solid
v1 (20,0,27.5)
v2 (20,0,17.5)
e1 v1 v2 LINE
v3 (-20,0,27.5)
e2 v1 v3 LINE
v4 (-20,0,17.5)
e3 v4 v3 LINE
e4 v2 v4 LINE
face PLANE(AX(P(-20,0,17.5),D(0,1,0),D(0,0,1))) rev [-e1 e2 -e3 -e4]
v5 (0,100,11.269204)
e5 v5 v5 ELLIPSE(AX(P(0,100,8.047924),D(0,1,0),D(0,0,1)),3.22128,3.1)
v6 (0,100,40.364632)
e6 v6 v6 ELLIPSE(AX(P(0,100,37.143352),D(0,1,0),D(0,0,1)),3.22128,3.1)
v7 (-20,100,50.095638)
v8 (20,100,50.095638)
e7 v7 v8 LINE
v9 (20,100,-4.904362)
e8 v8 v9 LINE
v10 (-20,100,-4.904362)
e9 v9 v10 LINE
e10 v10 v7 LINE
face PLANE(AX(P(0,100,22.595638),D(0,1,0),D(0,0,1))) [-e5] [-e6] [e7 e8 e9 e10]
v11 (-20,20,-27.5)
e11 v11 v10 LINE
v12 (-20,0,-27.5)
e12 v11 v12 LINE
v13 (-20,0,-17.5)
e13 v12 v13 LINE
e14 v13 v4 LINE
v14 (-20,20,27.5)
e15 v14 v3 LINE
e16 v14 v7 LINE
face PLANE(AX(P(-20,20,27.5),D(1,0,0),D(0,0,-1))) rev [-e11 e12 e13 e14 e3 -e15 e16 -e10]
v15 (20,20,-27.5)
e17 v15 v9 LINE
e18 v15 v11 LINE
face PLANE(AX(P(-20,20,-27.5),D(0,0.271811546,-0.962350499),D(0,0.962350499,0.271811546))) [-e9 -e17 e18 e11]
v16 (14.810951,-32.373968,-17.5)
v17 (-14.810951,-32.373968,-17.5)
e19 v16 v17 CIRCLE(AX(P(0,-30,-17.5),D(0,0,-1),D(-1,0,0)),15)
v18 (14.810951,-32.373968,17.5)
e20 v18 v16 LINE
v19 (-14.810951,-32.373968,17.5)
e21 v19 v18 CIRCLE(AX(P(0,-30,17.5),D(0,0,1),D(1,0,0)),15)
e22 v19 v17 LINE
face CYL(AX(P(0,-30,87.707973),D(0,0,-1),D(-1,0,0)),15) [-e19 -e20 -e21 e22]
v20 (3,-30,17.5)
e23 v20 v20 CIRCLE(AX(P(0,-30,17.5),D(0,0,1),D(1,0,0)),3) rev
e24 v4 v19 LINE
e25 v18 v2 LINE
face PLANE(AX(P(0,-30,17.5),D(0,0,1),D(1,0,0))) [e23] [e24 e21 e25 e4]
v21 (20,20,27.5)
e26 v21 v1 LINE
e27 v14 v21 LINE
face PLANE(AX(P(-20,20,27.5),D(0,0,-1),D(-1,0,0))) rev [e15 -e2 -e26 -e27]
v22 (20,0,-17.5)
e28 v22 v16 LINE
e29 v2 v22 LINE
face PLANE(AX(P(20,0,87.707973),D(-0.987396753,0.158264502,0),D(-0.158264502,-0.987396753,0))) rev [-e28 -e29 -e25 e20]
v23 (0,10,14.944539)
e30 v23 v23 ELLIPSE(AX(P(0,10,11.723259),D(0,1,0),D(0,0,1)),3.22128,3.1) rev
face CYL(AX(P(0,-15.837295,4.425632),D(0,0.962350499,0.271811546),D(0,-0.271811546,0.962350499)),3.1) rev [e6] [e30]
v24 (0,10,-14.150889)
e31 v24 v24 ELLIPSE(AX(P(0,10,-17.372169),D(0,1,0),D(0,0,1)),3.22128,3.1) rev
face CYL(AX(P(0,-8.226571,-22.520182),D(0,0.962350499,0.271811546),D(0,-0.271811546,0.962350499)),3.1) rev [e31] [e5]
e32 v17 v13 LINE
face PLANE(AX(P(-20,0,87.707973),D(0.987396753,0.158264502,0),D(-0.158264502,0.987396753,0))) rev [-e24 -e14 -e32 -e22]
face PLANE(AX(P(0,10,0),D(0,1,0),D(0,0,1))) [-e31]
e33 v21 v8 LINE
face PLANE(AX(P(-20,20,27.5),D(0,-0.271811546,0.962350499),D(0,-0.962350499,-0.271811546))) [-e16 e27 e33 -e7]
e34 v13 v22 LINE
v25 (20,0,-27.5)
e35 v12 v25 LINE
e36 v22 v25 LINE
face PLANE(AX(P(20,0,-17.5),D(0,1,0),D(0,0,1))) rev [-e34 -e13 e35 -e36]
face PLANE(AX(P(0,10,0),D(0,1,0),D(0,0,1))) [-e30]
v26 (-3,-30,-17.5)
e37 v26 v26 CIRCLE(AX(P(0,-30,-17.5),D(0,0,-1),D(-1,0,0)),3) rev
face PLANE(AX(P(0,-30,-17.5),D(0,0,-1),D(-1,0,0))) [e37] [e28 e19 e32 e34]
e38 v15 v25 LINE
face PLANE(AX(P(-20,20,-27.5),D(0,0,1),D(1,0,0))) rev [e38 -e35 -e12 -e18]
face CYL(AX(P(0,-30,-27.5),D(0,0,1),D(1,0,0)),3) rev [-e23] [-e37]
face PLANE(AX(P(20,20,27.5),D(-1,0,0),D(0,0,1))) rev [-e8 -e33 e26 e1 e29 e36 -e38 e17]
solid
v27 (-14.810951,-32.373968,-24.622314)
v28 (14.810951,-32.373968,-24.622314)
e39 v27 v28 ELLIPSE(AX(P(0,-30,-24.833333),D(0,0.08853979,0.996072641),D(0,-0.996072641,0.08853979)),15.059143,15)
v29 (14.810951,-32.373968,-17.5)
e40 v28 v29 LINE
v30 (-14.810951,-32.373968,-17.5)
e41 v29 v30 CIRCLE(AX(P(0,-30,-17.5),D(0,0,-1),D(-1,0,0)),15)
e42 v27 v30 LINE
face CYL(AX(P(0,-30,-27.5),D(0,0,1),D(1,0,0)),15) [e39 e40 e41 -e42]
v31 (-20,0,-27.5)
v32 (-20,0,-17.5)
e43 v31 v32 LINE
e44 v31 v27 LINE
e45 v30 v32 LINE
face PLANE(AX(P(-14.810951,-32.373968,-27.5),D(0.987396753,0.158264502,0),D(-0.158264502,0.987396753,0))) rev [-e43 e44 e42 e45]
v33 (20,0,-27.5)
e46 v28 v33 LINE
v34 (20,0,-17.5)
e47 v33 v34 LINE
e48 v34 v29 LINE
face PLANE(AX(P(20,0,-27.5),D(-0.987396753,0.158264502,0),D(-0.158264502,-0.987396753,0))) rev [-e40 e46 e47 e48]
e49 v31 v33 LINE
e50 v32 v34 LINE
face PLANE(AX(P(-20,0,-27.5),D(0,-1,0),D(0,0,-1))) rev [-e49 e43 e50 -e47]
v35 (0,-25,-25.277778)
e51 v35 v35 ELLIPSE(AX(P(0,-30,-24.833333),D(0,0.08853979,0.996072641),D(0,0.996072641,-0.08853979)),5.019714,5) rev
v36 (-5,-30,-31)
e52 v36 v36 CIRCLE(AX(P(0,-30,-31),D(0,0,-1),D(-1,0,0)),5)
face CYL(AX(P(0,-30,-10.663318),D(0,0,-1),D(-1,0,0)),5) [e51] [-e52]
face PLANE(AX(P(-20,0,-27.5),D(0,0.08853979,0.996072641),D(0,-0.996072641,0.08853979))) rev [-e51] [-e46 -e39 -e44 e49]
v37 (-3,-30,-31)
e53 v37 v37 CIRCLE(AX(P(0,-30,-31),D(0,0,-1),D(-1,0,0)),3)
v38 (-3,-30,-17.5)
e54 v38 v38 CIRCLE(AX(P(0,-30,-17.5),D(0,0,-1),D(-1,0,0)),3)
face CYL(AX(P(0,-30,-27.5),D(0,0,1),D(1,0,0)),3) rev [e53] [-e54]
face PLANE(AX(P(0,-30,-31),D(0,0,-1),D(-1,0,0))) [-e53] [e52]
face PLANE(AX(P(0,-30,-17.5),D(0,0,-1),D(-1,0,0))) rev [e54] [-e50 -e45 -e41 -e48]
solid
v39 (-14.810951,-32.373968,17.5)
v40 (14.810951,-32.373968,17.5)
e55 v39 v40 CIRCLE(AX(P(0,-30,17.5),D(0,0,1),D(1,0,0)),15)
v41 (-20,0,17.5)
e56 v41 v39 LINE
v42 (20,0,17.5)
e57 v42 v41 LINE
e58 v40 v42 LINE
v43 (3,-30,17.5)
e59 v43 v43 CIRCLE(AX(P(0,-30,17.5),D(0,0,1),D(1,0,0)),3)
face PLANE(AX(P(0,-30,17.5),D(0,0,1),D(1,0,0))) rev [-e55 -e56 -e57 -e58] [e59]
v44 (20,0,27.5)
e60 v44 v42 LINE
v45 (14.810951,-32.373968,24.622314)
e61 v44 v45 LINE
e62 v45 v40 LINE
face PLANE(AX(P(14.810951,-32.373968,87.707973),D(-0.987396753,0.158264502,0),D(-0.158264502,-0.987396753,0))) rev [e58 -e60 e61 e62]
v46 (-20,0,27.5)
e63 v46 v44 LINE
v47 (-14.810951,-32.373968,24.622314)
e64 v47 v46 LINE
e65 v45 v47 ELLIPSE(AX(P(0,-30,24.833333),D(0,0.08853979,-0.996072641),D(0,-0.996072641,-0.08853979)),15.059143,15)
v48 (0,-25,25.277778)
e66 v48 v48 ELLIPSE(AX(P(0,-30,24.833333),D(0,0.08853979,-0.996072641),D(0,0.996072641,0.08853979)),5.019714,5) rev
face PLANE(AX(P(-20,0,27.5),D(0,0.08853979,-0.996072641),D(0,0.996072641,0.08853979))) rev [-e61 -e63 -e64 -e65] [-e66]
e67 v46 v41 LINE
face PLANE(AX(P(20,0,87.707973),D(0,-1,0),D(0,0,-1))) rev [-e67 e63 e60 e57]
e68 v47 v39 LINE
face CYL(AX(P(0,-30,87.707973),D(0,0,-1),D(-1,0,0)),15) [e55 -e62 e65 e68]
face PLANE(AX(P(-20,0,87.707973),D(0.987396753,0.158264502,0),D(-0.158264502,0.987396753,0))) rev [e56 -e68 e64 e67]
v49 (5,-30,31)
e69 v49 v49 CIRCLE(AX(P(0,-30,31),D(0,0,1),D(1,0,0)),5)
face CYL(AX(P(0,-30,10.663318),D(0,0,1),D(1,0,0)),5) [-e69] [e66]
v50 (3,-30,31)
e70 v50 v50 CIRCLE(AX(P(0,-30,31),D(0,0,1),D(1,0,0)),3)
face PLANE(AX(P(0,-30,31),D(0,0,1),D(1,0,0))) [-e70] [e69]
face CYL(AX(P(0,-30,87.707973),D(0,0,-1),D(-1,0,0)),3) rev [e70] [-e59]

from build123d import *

# Parameters (mm, degrees)
CROQUIS1_W                          = 40
CROQUIS1_H                          = 55
SALIENTE_EXTRUIR1_DEPTH             = 20
SALIENTE_EXTRUIR2_REACH             = 41.449
SALIENTE_EXTRUIR2_DIRECTION_2_REACH = 41.449
CORTAR_EXTRUIR6_DEPTH               = 57.402570863
CORTAR_EXTRUIR6_DEPTH_BACK          = 57.402570863
CROQUIS6_R                          = 3
CORTAR_EXTRUIR10_DEPTH              = 10
CROQUIS11_R                         = 3
SALIENTE_EXTRUIR3_DEPTH             = 10
CORTAR_EXTRUIR11_DEPTH              = 57.402570863
CORTAR_EXTRUIR11_DEPTH_BACK         = 57.402570863
CORTAR_EXTRUIR15_START              = -10
CORTAR_EXTRUIR15_DEPTH              = 10
CROQUIS17_R                         = 3
SALIENTE_EXTRUIR4_DEPTH             = 10
CORTAR_EXTRUIR16_DEPTH              = 57.402570863
CORTAR_EXTRUIR16_DEPTH_BACK         = 57.402570863
CROQUIS21_R                         = 5
CROQUIS21_R_2                       = 3
SALIENTE_EXTRUIR5_DEPTH             = 3.5
SALIENTE_EXTRUIR5_DIRECTION_2_REACH = 75.824
CROQUIS22_R                         = 5
CROQUIS22_R_2                       = 3
SALIENTE_EXTRUIR6_DEPTH             = 3.5
SALIENTE_EXTRUIR6_DIRECTION_2_REACH = 78.467
BARRER1_START                       = -20
BARRER1_DEPTH                       = 40
CORTAR_EXTRUIR20_REACH              = 165.765
CROQUIS25_R                         = 3.1


# Read off the part's stored shape, not the designer's step: Barrer1
with BuildPart() as part:
    # Croquis1 → Saliente-Extruir1 (new body)
    with BuildSketch(Plane(origin=(0, 0, 0), x_dir=(1, 0, 0), z_dir=(0, 1, 0))):
        Rectangle(CROQUIS1_W, CROQUIS1_H)
    extrude(amount=SALIENTE_EXTRUIR1_DEPTH)

    # Saliente-Extruir2: up to this face of the body (flat: up to its plane)
    saliente_extruir2_end = Plane(part.part.faces().sort_by_distance((0, 10, 27.5))[0])
    # Croquis5 → Saliente-Extruir2 (add, up to the picked face)
    with BuildSketch(Plane.XY, mode=Mode.PRIVATE) as saliente_extruir2_sk1:
        with BuildLine():
            Line((-20, 0), (-14.810951292, -32.373967528))
            ThreePointArc((-14.810951292, -32.373967528), (0, -45), (14.810951292, -32.373967528))
            Line((14.810951292, -32.373967528), (20, 0))
            Line((20, 0), (-20, 0))
        make_face()
    saliente_extruir2_tool1 = split(extrude(saliente_extruir2_sk1.sketch, amount=SALIENTE_EXTRUIR2_REACH, mode=Mode.PRIVATE), bisect_by=saliente_extruir2_end, keep=Keep.BOTH, mode=Mode.PRIVATE)
    add(saliente_extruir2_tool1.solids().sort_by(Axis((0, -19.849245, 0), (0, 0, 1)))[0])

    # Saliente-Extruir2 direction 2: up to this face of the body (flat: up to its plane)
    saliente_extruir2_direction_2_end = Plane(part.part.faces().sort_by_distance((0, 10, -27.5))[0])
    # Croquis5 → Saliente-Extruir2 direction 2 (add, up to the picked face)
    with BuildSketch(Plane.XY, mode=Mode.PRIVATE) as saliente_extruir2_direction_2_sk1:
        with BuildLine():
            Line((-20, 0), (-14.810951292, -32.373967528))
            ThreePointArc((-14.810951292, -32.373967528), (0, -45), (14.810951292, -32.373967528))
            Line((14.810951292, -32.373967528), (20, 0))
            Line((20, 0), (-20, 0))
        make_face()
    saliente_extruir2_direction_2_tool1 = split(extrude(saliente_extruir2_direction_2_sk1.sketch, amount=-SALIENTE_EXTRUIR2_DIRECTION_2_REACH, mode=Mode.PRIVATE), bisect_by=saliente_extruir2_direction_2_end, keep=Keep.BOTH, mode=Mode.PRIVATE)
    add(saliente_extruir2_direction_2_tool1.solids().sort_by(Axis((0, -19.849245, 0), (0, 0, -1)))[0])

    # Croquis6 → Cortar-Extruir6 (cut, two sides: drawn at the far end of the back side and taken through both)
    with BuildSketch(Plane.XY.offset(-CORTAR_EXTRUIR6_DEPTH_BACK)):
        with Locations((0, -30)):
            Circle(CROQUIS6_R)
    extrude(amount=CORTAR_EXTRUIR6_DEPTH + CORTAR_EXTRUIR6_DEPTH_BACK, mode=Mode.SUBTRACT)

    # Croquis10 → Cortar-Extruir10 (cut)
    with BuildSketch(Plane(origin=(0, 0, -27.5), x_dir=(-1, 0, 0), z_dir=(0, 0, -1))):
        with BuildLine():
            Line((14.810951292, -32.373967528), (20, 0))
            Line((20, 0), (-20, 0))
            Line((-20, 0), (-14.810951292, -32.373967528))
            ThreePointArc((-14.810951292, -32.373967528), (0, -45), (14.810951292, -32.373967528))
        make_face()
    extrude(amount=-CORTAR_EXTRUIR10_DEPTH, mode=Mode.SUBTRACT)

    # Croquis16 → Cortar-Extruir15 (cut)
    with BuildSketch(Plane.XY.offset(27.5).offset(CORTAR_EXTRUIR15_START)):
        with BuildLine():
            Line((-20, 0), (20, 0))
            Line((20, 0), (14.810951292, -32.373967528))
            ThreePointArc((14.810951292, -32.373967528), (0, -45), (-14.810951292, -32.373967528))
            Line((-14.810951292, -32.373967528), (-20, 0))
        make_face()
    extrude(amount=CORTAR_EXTRUIR15_DEPTH, mode=Mode.SUBTRACT)

    # Barrer1 outline → Barrer1 (add)
    with BuildSketch(Plane.YZ.offset(BARRER1_START)):
        Polygon((20, -27.5), (100, -4.904361816), (100, 50.095638184), (20, 27.5), align=None)
    extrude(amount=BARRER1_DEPTH)

    # Cortar-Extruir20: up to this plane
    cortar_extruir20_end = Plane(origin=(0, 10, 0), z_dir=(0, 1, 0))
    # Croquis25 → Cortar-Extruir20 (cut, up to the surface)
    with BuildSketch(Plane(origin=(0, 105.715764038, 29.858939432), x_dir=(1, 0, 0), z_dir=(0, 0.9623504992532018, 0.27181154608867053)), mode=Mode.PRIVATE) as cortar_extruir20_sk1:
        with Locations(Location((0, 19.436230922, 0), (0, 0, 270))):
            Circle(CROQUIS25_R)
    cortar_extruir20_tool1 = split(extrude(cortar_extruir20_sk1.sketch, amount=-CORTAR_EXTRUIR20_REACH, mode=Mode.PRIVATE), bisect_by=cortar_extruir20_end, keep=Keep.BOTH, mode=Mode.PRIVATE)
    add(cortar_extruir20_tool1.solids().sort_by_distance((0, 110.998756, 11.154473))[0], mode=Mode.SUBTRACT)
    # Croquis25 → Cortar-Extruir20 (cut, up to the surface)
    with BuildSketch(Plane(origin=(0, 105.715764038, 29.858939432), x_dir=(1, 0, 0), z_dir=(0, 0.9623504992532018, 0.27181154608867053)), mode=Mode.PRIVATE) as cortar_extruir20_sk2:
        with Locations(Location((0, -8.563769078, 0), (0, 0, 270))):
            Circle(CROQUIS25_R)
    cortar_extruir20_tool2 = split(extrude(cortar_extruir20_sk2.sketch, amount=-CORTAR_EXTRUIR20_REACH, mode=Mode.PRIVATE), bisect_by=cortar_extruir20_end, keep=Keep.BOTH, mode=Mode.PRIVATE)
    add(cortar_extruir20_tool2.solids().sort_by_distance((0, 103.388033, 38.100287))[0], mode=Mode.SUBTRACT)


with BuildPart() as body_2:
    # Croquis11 → Saliente-Extruir3 (new body)
    with BuildSketch(Plane(origin=(0, 0, -17.5), x_dir=(-1, 0, 0), z_dir=(0, 0, -1))):
        with BuildLine():
            Line((20, 0), (-20, 0))
            Line((-20, 0), (-14.810951292, -32.373967528))
            ThreePointArc((-14.810951292, -32.373967528), (0, -45), (14.810951292, -32.373967528))
            Line((14.810951292, -32.373967528), (20, 0))
        make_face()
        with Locations((0, -30)):
            Circle(CROQUIS11_R, mode=Mode.SUBTRACT)
    extrude(amount=SALIENTE_EXTRUIR3_DEPTH)

    # Croquis12 → Cortar-Extruir11 (cut, two sides: drawn at the far end of the back side and taken through both)
    with BuildSketch(Plane(origin=(0, 0, 0), x_dir=(0, 0, -1), z_dir=(1, 0, 0)).offset(-CORTAR_EXTRUIR11_DEPTH_BACK)):
        with BuildLine():
            Line((27.5, 0), (23.5, -45))
            add(Edge.make_bspline(
                [(23.5, -45), (53.895048744, -65.691423054), (27.5, 0)],
                knots=[0, 0, 0, 1, 1, 1], degree=2))
        make_face()
    extrude(amount=CORTAR_EXTRUIR11_DEPTH + CORTAR_EXTRUIR11_DEPTH_BACK, mode=Mode.SUBTRACT)

    # Croquis22 → Saliente-Extruir6 (add)
    with BuildSketch(Plane(origin=(0, 0, -27.5), x_dir=(-1, 0, 0), z_dir=(0, 0, -1))):
        with Locations(Location((0, -30, 0), (0, 0, 180))):
            Circle(CROQUIS22_R)
        with Locations(Location((0, -30, 0), (0, 0, 180))):
            Circle(CROQUIS22_R_2, mode=Mode.SUBTRACT)
    extrude(amount=SALIENTE_EXTRUIR6_DEPTH)

    # Saliente-Extruir6 direction 2: up to this face of the body (flat: up to its plane)
    saliente_extruir6_direction_2_end = Plane(body_2.part.faces().sort_by_distance((0, -19.641450964, -25.754093248))[0])
    # Croquis22 → Saliente-Extruir6 direction 2 (add, up to the picked face)
    with BuildSketch(Plane(origin=(0, 0, -27.5), x_dir=(-1, 0, 0), z_dir=(0, 0, -1)), mode=Mode.PRIVATE) as saliente_extruir6_direction_2_sk1:
        with Locations(Location((0, -30, 0), (0, 0, 180))):
            Circle(CROQUIS22_R)
        with Locations(Location((0, -30, 0), (0, 0, 180))):
            Circle(CROQUIS22_R_2, mode=Mode.SUBTRACT)
    saliente_extruir6_direction_2_tool1 = split(extrude(saliente_extruir6_direction_2_sk1.sketch, amount=-SALIENTE_EXTRUIR6_DIRECTION_2_REACH, mode=Mode.PRIVATE), bisect_by=saliente_extruir6_direction_2_end, keep=Keep.BOTH, mode=Mode.PRIVATE)
    add(saliente_extruir6_direction_2_tool1.solids().sort_by(Axis((-4.858579, -30, -27.5), (0, 0, 1)))[0])


with BuildPart() as body_3:
    # Croquis17 → Saliente-Extruir4 (new body)
    with BuildSketch(Plane.XY.offset(17.5)):
        with BuildLine():
            Line((14.810951292, -32.373967528), (20, 0))
            Line((20, 0), (-20, 0))
            Line((-20, 0), (-14.810951292, -32.373967528))
            ThreePointArc((-14.810951292, -32.373967528), (0, -45), (14.810951292, -32.373967528))
        make_face()
        with Locations(Location((0, -30, 0), (0, 0, 180))):
            Circle(CROQUIS17_R, mode=Mode.SUBTRACT)
    extrude(amount=SALIENTE_EXTRUIR4_DEPTH)

    # Croquis18 → Cortar-Extruir16 (cut, two sides: drawn at the far end of the back side and taken through both)
    with BuildSketch(Plane(origin=(0, 0, 0), x_dir=(0, 0, -1), z_dir=(1, 0, 0)).offset(-CORTAR_EXTRUIR16_DEPTH_BACK)):
        with BuildLine():
            Line((-27.5, 0), (-23.5, -45))
            add(Edge.make_bspline(
                [(-23.5, -45), (-50.99373039, -70.964066745), (-27.5, 0)],
                knots=[0, 0, 0, 1, 1, 1], degree=2))
        make_face()
    extrude(amount=CORTAR_EXTRUIR16_DEPTH + CORTAR_EXTRUIR16_DEPTH_BACK, mode=Mode.SUBTRACT)

    # Croquis21 → Saliente-Extruir5 (add)
    with BuildSketch(Plane.XY.offset(27.5)):
        with Locations((0, -30)):
            Circle(CROQUIS21_R)
        with Locations((0, -30)):
            Circle(CROQUIS21_R_2, mode=Mode.SUBTRACT)
    extrude(amount=SALIENTE_EXTRUIR5_DEPTH)

    # Saliente-Extruir5 direction 2: up to this face of the body (flat: up to its plane)
    saliente_extruir5_direction_2_end = Plane(body_3.part.faces().sort_by_distance((0, -19.641450964, 25.754093248))[0])
    # Croquis21 → Saliente-Extruir5 direction 2 (add, up to the picked face)
    with BuildSketch(Plane.XY.offset(27.5), mode=Mode.PRIVATE) as saliente_extruir5_direction_2_sk1:
        with Locations((0, -30)):
            Circle(CROQUIS21_R)
        with Locations((0, -30)):
            Circle(CROQUIS21_R_2, mode=Mode.SUBTRACT)
    saliente_extruir5_direction_2_tool1 = split(extrude(saliente_extruir5_direction_2_sk1.sketch, amount=-SALIENTE_EXTRUIR5_DIRECTION_2_REACH, mode=Mode.PRIVATE), bisect_by=saliente_extruir5_direction_2_end, keep=Keep.BOTH, mode=Mode.PRIVATE)
    add(saliente_extruir5_direction_2_tool1.solids().sort_by(Axis((-4.858579, -30, 27.5), (0, 0, -1)))[0])


solid = Compound([part.part, body_2.part, body_3.part])
